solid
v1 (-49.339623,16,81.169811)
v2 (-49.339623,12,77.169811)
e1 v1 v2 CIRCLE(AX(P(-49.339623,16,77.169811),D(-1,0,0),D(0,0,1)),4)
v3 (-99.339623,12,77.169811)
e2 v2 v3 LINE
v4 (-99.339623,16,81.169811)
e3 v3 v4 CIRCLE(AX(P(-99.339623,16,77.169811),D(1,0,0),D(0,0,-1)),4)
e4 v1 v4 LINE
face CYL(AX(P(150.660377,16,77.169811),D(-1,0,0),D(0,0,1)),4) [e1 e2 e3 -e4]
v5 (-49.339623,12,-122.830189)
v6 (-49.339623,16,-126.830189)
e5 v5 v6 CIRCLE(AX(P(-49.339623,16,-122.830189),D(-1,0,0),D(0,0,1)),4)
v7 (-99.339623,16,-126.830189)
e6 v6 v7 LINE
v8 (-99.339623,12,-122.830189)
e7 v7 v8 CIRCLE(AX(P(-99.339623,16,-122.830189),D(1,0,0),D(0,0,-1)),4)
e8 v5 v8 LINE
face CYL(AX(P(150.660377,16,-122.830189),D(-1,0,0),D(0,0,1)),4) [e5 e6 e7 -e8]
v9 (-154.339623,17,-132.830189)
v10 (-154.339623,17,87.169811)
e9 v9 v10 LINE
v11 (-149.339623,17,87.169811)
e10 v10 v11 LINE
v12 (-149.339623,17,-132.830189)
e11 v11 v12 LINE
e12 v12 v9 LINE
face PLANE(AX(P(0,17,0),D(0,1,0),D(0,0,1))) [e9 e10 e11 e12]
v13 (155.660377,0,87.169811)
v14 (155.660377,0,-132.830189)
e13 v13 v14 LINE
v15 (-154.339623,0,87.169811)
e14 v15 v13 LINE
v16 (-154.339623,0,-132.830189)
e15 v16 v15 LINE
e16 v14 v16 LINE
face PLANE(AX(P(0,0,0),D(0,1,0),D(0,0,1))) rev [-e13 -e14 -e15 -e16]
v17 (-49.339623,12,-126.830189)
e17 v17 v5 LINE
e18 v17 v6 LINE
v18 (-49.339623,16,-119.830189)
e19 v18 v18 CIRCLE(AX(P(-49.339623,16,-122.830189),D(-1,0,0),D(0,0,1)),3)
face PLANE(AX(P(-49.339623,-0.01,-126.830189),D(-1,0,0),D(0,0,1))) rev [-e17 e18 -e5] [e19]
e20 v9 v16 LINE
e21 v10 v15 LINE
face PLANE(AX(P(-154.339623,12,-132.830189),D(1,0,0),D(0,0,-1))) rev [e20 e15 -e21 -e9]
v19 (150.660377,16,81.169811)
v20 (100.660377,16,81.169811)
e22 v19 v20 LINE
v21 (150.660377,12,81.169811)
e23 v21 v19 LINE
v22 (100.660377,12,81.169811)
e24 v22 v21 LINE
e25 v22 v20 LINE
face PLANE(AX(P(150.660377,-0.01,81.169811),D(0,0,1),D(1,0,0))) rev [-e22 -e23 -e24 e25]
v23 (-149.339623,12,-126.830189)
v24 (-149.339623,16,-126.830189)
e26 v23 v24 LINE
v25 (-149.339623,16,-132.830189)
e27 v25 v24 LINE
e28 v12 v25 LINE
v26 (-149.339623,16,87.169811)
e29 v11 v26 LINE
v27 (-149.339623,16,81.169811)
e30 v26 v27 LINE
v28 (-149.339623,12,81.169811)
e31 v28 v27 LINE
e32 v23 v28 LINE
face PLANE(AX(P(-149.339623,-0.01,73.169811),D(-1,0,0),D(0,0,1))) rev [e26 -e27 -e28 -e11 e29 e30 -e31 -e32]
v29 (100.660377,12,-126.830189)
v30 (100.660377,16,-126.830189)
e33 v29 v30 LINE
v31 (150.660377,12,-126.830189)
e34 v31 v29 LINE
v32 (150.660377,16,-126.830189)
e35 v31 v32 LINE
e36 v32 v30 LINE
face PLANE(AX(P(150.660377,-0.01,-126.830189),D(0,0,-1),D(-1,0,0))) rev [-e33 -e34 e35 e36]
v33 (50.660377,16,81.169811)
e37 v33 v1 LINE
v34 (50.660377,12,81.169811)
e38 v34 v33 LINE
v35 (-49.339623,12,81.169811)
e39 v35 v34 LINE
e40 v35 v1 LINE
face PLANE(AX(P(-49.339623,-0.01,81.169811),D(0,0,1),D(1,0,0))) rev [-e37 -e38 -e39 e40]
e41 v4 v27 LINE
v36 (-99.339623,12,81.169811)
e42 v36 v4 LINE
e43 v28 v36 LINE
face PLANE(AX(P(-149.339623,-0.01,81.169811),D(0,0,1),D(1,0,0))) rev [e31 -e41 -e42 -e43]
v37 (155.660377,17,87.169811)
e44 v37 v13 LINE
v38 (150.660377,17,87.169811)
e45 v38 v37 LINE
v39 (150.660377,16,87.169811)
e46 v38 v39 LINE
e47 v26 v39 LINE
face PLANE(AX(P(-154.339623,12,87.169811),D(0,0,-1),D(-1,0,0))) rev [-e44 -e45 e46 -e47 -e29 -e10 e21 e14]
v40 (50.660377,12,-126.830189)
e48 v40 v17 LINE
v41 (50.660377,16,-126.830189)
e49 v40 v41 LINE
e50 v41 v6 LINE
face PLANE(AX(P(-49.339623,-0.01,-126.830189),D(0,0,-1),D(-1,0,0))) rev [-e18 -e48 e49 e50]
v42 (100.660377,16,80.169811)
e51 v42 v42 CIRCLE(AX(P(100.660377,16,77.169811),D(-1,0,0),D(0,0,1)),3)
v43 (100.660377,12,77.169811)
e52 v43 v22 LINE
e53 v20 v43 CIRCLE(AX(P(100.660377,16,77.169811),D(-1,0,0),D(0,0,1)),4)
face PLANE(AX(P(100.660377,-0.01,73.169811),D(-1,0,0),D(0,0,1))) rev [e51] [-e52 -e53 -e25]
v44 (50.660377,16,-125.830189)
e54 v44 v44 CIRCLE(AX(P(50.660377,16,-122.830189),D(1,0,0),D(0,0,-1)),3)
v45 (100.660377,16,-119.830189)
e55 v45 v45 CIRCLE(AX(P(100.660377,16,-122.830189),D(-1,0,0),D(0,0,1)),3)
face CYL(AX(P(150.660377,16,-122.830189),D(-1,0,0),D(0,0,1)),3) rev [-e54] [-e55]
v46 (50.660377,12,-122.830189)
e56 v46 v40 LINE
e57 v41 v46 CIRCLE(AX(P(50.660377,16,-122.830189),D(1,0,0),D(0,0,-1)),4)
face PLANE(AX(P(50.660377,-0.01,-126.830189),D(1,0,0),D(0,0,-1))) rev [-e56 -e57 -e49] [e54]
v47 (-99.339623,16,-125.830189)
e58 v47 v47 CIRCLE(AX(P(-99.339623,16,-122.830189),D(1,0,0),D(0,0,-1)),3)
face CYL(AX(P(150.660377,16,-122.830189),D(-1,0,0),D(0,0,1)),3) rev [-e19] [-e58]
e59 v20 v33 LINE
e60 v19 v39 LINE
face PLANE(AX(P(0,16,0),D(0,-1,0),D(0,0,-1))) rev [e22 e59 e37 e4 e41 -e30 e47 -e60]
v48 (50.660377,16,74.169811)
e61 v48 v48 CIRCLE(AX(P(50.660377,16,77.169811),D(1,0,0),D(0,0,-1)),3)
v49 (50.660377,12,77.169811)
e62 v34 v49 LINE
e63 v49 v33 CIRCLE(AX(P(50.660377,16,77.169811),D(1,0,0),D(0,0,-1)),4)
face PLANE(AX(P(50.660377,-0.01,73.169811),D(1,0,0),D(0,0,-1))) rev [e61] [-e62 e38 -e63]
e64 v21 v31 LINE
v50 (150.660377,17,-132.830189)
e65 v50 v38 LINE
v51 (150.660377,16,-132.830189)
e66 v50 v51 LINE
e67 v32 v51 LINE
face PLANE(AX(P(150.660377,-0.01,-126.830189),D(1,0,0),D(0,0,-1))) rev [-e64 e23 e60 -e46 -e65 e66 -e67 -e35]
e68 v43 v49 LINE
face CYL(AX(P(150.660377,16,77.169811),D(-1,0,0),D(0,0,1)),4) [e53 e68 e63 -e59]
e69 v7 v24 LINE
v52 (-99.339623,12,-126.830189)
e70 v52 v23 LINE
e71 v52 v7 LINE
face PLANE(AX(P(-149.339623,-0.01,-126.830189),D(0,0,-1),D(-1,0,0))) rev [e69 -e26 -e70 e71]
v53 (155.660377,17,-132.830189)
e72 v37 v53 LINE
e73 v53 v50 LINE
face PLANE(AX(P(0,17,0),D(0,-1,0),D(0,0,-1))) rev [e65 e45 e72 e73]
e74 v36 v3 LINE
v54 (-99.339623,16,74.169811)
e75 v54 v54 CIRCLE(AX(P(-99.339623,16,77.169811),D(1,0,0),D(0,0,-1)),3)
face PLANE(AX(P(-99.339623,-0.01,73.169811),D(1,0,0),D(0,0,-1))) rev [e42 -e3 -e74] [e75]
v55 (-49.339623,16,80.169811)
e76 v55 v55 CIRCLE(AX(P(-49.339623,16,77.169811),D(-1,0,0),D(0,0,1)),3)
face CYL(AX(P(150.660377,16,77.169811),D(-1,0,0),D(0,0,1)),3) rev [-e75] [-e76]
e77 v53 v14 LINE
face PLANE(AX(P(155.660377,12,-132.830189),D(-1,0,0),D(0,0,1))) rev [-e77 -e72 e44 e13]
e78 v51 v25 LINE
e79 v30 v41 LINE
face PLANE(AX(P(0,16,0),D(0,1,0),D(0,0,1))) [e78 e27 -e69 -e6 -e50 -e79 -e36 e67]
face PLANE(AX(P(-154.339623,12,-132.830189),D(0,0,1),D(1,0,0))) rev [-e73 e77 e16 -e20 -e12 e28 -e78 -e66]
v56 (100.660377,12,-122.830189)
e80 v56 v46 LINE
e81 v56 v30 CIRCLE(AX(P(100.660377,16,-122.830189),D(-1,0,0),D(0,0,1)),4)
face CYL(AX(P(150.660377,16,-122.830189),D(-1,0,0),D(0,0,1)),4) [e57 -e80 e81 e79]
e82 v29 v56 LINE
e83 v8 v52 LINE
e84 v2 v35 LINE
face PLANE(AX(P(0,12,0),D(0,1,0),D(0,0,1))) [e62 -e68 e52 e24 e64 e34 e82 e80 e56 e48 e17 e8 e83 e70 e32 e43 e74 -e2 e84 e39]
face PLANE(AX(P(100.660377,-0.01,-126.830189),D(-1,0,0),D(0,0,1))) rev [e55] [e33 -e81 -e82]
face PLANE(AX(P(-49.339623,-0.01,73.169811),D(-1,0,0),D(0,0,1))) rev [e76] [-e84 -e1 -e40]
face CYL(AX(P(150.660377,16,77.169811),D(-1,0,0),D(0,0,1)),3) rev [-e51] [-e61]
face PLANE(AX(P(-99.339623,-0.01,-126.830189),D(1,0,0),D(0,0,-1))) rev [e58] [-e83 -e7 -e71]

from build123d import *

# Parameters (mm, degrees)
SKETCH_1_W                 = 310
SKETCH_1_H                 = 220
EXTRUDE_1_DEPTH            = 12
SKETCH_8_W                 = 310
SKETCH_8_H                 = 10
EXTRUDE_12_DEPTH           = 4
SKETCH_10_R                = 4
CUT_EXTRUDE_5_DEPTH        = 305
SKETCH_11_W                = 4
SKETCH_11_H                = 4
EXTRUDE_13_DEPTH           = 5
EXTRUDE_START              = 300
SKETCH_12_R                = 4
SKETCH_12_R_2              = 3
EXTRUDE_1_2_DEPTH          = 300
SPLIT_START                = -49.339622642
SPLIT_BODIES_2_OUTLINE_R   = 3
SPLIT_BODIES_2_DEPTH       = 100
SPLIT_START_2              = -149.339622642
SPLIT_BODIES_2_2_OUTLINE_R = 3
SPLIT_BODIES_2_2_DEPTH     = 50
SPLIT_START_3              = 100.660377358
SPLIT_BODIES_2_3_OUTLINE_R = 3
SPLIT_BODIES_2_3_DEPTH     = 50
SKETCH_14_W                = 50
SKETCH_14_H                = 8
SKETCH_14_W_2              = 100
EXTRUDE_14_DEPTH           = 12
SKETCH_15_W                = 5
SKETCH_15_H                = 220
EXTRUDE_15_DEPTH           = 5


# Read off the part's stored shape, not the designer's step: 分割2
with BuildPart() as part:
    # 草图1 → Extrude 1 (new body)
    with BuildSketch(Plane(origin=(0, 0, 0), x_dir=(1, 0, 0), z_dir=(0, 1, 0))):
        with Locations((0.660377358, 22.830188679)):
            Rectangle(SKETCH_1_W, SKETCH_1_H)
    extrude(amount=EXTRUDE_1_DEPTH)

    # 草图8 → 凸台-拉伸12 (add)
    with BuildSketch(Plane(origin=(0, 12, 0), x_dir=(1, 0, 0), z_dir=(0, 1, 0))):
        with Locations((0.660377358, 127.830188679)):
            Rectangle(SKETCH_8_W, SKETCH_8_H)
        with Locations((0.660377358, -82.169811321)):
            Rectangle(SKETCH_8_W, SKETCH_8_H)
    extrude(amount=EXTRUDE_12_DEPTH)

    # 草图10 → 切除-拉伸5 (cut)
    with BuildSketch(Plane(origin=(155.660377358, 0, 0), x_dir=(0, 0, -1), z_dir=(1, 0, 0))):
        with Locations((-77.169811321, 16)):
            Circle(SKETCH_10_R)
        with Locations((122.830188679, 16)):
            Circle(SKETCH_10_R)
    extrude(amount=-CUT_EXTRUDE_5_DEPTH, mode=Mode.SUBTRACT)

    # 草图11 → 凸台-拉伸13 (add)
    with BuildSketch(Plane(origin=(155.660377358, 0, 0), x_dir=(0, 0, -1), z_dir=(1, 0, 0))):
        with Locations((-79.169811321, 14)):
            Rectangle(SKETCH_11_W, SKETCH_11_H)
        with Locations((124.830188679, 14)):
            Rectangle(SKETCH_11_W, SKETCH_11_H)
    extrude(amount=-EXTRUDE_13_DEPTH)

    # 草图12 → Extrude 1 2 (add)
    # profile 1 of 2: a face of its own
    with BuildSketch(Plane(origin=(-149.339622642, 0, 0), x_dir=(0, 0, -1), z_dir=(1, 0, 0)).offset(EXTRUDE_START)):
        with Locations((-77.169811321, 16)):
            Circle(SKETCH_12_R)
        with Locations((-77.169811321, 16)):
            Circle(SKETCH_12_R_2, mode=Mode.SUBTRACT)
    # profile 2 of 2: a face of its own
    with BuildSketch(Plane(origin=(-149.339622642, 0, 0), x_dir=(0, 0, -1), z_dir=(1, 0, 0)).offset(EXTRUDE_START)):
        with Locations((122.830188679, 16)):
            Circle(SKETCH_12_R)
        with Locations((122.830188679, 16)):
            Circle(SKETCH_12_R_2, mode=Mode.SUBTRACT)
    extrude(amount=-EXTRUDE_1_2_DEPTH)

    # Split Bodies 2 outline → Split Bodies 2 (cut)
    # profile 1 of 2: a face of its own
    with BuildSketch(Plane.YZ.offset(SPLIT_START)):
        with BuildLine():
            Line((12, -122.830188679), (12, -118.830188679))
            Line((12, -118.830188679), (0, -118.830188679))
            Line((0, -118.830188679), (0, -126.830188679))
            Line((0, -126.830188679), (16, -126.830188679))
            ThreePointArc((16, -126.830188679), (18.828427125, -120.001761554), (12, -122.830188679))
        make_face()
        with Locations((16, -122.830188679)):
            Circle(SPLIT_BODIES_2_OUTLINE_R, mode=Mode.SUBTRACT)
    # profile 2 of 2: a face of its own
    with BuildSketch(Plane.YZ.offset(SPLIT_START)):
        with BuildLine():
            Line((0, 73.169811321), (12, 73.169811321))
            Line((12, 73.169811321), (12, 77.169811321))
            ThreePointArc((12, 77.169811321), (18.828427125, 74.341384196), (16, 81.169811321))
            Line((16, 81.169811321), (0, 81.169811321))
            Line((0, 81.169811321), (0, 73.169811321))
        make_face()
        with Locations((16, 77.169811321)):
            Circle(SPLIT_BODIES_2_OUTLINE_R, mode=Mode.SUBTRACT)
    extrude(amount=SPLIT_BODIES_2_DEPTH, mode=Mode.SUBTRACT)

    # Split Bodies 2 2 outline → Split Bodies 2 2 (cut)
    # profile 1 of 2: a face of its own
    with BuildSketch(Plane.YZ.offset(SPLIT_START_2)):
        with BuildLine():
            Line((12, -122.830188679), (12, -118.830188679))
            Line((12, -118.830188679), (0, -118.830188679))
            Line((0, -118.830188679), (0, -126.830188679))
            Line((0, -126.830188679), (16, -126.830188679))
            ThreePointArc((16, -126.830188679), (18.828427125, -120.001761554), (12, -122.830188679))
        make_face()
        with Locations((16, -122.830188679)):
            Circle(SPLIT_BODIES_2_2_OUTLINE_R, mode=Mode.SUBTRACT)
    # profile 2 of 2: a face of its own
    with BuildSketch(Plane.YZ.offset(SPLIT_START_2)):
        with BuildLine():
            Line((0, 73.169811321), (12, 73.169811321))
            Line((12, 73.169811321), (12, 77.169811321))
            ThreePointArc((12, 77.169811321), (18.828427125, 74.341384196), (16, 81.169811321))
            Line((16, 81.169811321), (0, 81.169811321))
            Line((0, 81.169811321), (0, 73.169811321))
        make_face()
        with Locations((16, 77.169811321)):
            Circle(SPLIT_BODIES_2_2_OUTLINE_R, mode=Mode.SUBTRACT)
    extrude(amount=SPLIT_BODIES_2_2_DEPTH, mode=Mode.SUBTRACT)

    # Split Bodies 2 3 outline → Split Bodies 2 3 (cut)
    # profile 1 of 2: a face of its own
    with BuildSketch(Plane.YZ.offset(SPLIT_START_3)):
        with BuildLine():
            Line((12, -122.830188679), (12, -118.830188679))
            Line((12, -118.830188679), (0, -118.830188679))
            Line((0, -118.830188679), (0, -126.830188679))
            Line((0, -126.830188679), (16, -126.830188679))
            ThreePointArc((16, -126.830188679), (18.828427125, -120.001761554), (12, -122.830188679))
        make_face()
        with Locations((16, -122.830188679)):
            Circle(SPLIT_BODIES_2_3_OUTLINE_R, mode=Mode.SUBTRACT)
    # profile 2 of 2: a face of its own
    with BuildSketch(Plane.YZ.offset(SPLIT_START_3)):
        with BuildLine():
            Line((0, 73.169811321), (12, 73.169811321))
            Line((12, 73.169811321), (12, 77.169811321))
            ThreePointArc((12, 77.169811321), (18.828427125, 74.341384196), (16, 81.169811321))
            Line((16, 81.169811321), (0, 81.169811321))
            Line((0, 81.169811321), (0, 73.169811321))
        make_face()
        with Locations((16, 77.169811321)):
            Circle(SPLIT_BODIES_2_3_OUTLINE_R, mode=Mode.SUBTRACT)
    extrude(amount=SPLIT_BODIES_2_3_DEPTH, mode=Mode.SUBTRACT)

    # 草图14 → 凸台-拉伸14 (add)
    with BuildSketch(Plane(origin=(0, 12, 0), x_dir=(1, 0, 0), z_dir=(0, 1, 0))):
        with Locations((-124.339622642, 122.830188679)):
            Rectangle(SKETCH_14_W, SKETCH_14_H)
        with Locations((125.660377358, 122.830188679)):
            Rectangle(SKETCH_14_W, SKETCH_14_H)
        with Locations((-124.339622642, -77.169811321)):
            Rectangle(SKETCH_14_W, SKETCH_14_H)
        with Locations((125.660377358, -77.169811321)):
            Rectangle(SKETCH_14_W, SKETCH_14_H)
        with Locations((0.660377358, -77.169811321)):
            Rectangle(SKETCH_14_W_2, SKETCH_14_H)
        with Locations((0.660377358, 122.830188679)):
            Rectangle(SKETCH_14_W_2, SKETCH_14_H)
    extrude(amount=-EXTRUDE_14_DEPTH)

    # 草图15 → 凸台-拉伸15 (add)
    with BuildSketch(Plane(origin=(0, 12, 0), x_dir=(1, 0, 0), z_dir=(0, 1, 0))):
        with Locations((-151.839622642, 22.830188679)):
            Rectangle(SKETCH_15_W, SKETCH_15_H)
        with Locations((153.160377358, 22.830188679)):
            Rectangle(SKETCH_15_W, SKETCH_15_H)
    extrude(amount=EXTRUDE_15_DEPTH)


solid = part.part
